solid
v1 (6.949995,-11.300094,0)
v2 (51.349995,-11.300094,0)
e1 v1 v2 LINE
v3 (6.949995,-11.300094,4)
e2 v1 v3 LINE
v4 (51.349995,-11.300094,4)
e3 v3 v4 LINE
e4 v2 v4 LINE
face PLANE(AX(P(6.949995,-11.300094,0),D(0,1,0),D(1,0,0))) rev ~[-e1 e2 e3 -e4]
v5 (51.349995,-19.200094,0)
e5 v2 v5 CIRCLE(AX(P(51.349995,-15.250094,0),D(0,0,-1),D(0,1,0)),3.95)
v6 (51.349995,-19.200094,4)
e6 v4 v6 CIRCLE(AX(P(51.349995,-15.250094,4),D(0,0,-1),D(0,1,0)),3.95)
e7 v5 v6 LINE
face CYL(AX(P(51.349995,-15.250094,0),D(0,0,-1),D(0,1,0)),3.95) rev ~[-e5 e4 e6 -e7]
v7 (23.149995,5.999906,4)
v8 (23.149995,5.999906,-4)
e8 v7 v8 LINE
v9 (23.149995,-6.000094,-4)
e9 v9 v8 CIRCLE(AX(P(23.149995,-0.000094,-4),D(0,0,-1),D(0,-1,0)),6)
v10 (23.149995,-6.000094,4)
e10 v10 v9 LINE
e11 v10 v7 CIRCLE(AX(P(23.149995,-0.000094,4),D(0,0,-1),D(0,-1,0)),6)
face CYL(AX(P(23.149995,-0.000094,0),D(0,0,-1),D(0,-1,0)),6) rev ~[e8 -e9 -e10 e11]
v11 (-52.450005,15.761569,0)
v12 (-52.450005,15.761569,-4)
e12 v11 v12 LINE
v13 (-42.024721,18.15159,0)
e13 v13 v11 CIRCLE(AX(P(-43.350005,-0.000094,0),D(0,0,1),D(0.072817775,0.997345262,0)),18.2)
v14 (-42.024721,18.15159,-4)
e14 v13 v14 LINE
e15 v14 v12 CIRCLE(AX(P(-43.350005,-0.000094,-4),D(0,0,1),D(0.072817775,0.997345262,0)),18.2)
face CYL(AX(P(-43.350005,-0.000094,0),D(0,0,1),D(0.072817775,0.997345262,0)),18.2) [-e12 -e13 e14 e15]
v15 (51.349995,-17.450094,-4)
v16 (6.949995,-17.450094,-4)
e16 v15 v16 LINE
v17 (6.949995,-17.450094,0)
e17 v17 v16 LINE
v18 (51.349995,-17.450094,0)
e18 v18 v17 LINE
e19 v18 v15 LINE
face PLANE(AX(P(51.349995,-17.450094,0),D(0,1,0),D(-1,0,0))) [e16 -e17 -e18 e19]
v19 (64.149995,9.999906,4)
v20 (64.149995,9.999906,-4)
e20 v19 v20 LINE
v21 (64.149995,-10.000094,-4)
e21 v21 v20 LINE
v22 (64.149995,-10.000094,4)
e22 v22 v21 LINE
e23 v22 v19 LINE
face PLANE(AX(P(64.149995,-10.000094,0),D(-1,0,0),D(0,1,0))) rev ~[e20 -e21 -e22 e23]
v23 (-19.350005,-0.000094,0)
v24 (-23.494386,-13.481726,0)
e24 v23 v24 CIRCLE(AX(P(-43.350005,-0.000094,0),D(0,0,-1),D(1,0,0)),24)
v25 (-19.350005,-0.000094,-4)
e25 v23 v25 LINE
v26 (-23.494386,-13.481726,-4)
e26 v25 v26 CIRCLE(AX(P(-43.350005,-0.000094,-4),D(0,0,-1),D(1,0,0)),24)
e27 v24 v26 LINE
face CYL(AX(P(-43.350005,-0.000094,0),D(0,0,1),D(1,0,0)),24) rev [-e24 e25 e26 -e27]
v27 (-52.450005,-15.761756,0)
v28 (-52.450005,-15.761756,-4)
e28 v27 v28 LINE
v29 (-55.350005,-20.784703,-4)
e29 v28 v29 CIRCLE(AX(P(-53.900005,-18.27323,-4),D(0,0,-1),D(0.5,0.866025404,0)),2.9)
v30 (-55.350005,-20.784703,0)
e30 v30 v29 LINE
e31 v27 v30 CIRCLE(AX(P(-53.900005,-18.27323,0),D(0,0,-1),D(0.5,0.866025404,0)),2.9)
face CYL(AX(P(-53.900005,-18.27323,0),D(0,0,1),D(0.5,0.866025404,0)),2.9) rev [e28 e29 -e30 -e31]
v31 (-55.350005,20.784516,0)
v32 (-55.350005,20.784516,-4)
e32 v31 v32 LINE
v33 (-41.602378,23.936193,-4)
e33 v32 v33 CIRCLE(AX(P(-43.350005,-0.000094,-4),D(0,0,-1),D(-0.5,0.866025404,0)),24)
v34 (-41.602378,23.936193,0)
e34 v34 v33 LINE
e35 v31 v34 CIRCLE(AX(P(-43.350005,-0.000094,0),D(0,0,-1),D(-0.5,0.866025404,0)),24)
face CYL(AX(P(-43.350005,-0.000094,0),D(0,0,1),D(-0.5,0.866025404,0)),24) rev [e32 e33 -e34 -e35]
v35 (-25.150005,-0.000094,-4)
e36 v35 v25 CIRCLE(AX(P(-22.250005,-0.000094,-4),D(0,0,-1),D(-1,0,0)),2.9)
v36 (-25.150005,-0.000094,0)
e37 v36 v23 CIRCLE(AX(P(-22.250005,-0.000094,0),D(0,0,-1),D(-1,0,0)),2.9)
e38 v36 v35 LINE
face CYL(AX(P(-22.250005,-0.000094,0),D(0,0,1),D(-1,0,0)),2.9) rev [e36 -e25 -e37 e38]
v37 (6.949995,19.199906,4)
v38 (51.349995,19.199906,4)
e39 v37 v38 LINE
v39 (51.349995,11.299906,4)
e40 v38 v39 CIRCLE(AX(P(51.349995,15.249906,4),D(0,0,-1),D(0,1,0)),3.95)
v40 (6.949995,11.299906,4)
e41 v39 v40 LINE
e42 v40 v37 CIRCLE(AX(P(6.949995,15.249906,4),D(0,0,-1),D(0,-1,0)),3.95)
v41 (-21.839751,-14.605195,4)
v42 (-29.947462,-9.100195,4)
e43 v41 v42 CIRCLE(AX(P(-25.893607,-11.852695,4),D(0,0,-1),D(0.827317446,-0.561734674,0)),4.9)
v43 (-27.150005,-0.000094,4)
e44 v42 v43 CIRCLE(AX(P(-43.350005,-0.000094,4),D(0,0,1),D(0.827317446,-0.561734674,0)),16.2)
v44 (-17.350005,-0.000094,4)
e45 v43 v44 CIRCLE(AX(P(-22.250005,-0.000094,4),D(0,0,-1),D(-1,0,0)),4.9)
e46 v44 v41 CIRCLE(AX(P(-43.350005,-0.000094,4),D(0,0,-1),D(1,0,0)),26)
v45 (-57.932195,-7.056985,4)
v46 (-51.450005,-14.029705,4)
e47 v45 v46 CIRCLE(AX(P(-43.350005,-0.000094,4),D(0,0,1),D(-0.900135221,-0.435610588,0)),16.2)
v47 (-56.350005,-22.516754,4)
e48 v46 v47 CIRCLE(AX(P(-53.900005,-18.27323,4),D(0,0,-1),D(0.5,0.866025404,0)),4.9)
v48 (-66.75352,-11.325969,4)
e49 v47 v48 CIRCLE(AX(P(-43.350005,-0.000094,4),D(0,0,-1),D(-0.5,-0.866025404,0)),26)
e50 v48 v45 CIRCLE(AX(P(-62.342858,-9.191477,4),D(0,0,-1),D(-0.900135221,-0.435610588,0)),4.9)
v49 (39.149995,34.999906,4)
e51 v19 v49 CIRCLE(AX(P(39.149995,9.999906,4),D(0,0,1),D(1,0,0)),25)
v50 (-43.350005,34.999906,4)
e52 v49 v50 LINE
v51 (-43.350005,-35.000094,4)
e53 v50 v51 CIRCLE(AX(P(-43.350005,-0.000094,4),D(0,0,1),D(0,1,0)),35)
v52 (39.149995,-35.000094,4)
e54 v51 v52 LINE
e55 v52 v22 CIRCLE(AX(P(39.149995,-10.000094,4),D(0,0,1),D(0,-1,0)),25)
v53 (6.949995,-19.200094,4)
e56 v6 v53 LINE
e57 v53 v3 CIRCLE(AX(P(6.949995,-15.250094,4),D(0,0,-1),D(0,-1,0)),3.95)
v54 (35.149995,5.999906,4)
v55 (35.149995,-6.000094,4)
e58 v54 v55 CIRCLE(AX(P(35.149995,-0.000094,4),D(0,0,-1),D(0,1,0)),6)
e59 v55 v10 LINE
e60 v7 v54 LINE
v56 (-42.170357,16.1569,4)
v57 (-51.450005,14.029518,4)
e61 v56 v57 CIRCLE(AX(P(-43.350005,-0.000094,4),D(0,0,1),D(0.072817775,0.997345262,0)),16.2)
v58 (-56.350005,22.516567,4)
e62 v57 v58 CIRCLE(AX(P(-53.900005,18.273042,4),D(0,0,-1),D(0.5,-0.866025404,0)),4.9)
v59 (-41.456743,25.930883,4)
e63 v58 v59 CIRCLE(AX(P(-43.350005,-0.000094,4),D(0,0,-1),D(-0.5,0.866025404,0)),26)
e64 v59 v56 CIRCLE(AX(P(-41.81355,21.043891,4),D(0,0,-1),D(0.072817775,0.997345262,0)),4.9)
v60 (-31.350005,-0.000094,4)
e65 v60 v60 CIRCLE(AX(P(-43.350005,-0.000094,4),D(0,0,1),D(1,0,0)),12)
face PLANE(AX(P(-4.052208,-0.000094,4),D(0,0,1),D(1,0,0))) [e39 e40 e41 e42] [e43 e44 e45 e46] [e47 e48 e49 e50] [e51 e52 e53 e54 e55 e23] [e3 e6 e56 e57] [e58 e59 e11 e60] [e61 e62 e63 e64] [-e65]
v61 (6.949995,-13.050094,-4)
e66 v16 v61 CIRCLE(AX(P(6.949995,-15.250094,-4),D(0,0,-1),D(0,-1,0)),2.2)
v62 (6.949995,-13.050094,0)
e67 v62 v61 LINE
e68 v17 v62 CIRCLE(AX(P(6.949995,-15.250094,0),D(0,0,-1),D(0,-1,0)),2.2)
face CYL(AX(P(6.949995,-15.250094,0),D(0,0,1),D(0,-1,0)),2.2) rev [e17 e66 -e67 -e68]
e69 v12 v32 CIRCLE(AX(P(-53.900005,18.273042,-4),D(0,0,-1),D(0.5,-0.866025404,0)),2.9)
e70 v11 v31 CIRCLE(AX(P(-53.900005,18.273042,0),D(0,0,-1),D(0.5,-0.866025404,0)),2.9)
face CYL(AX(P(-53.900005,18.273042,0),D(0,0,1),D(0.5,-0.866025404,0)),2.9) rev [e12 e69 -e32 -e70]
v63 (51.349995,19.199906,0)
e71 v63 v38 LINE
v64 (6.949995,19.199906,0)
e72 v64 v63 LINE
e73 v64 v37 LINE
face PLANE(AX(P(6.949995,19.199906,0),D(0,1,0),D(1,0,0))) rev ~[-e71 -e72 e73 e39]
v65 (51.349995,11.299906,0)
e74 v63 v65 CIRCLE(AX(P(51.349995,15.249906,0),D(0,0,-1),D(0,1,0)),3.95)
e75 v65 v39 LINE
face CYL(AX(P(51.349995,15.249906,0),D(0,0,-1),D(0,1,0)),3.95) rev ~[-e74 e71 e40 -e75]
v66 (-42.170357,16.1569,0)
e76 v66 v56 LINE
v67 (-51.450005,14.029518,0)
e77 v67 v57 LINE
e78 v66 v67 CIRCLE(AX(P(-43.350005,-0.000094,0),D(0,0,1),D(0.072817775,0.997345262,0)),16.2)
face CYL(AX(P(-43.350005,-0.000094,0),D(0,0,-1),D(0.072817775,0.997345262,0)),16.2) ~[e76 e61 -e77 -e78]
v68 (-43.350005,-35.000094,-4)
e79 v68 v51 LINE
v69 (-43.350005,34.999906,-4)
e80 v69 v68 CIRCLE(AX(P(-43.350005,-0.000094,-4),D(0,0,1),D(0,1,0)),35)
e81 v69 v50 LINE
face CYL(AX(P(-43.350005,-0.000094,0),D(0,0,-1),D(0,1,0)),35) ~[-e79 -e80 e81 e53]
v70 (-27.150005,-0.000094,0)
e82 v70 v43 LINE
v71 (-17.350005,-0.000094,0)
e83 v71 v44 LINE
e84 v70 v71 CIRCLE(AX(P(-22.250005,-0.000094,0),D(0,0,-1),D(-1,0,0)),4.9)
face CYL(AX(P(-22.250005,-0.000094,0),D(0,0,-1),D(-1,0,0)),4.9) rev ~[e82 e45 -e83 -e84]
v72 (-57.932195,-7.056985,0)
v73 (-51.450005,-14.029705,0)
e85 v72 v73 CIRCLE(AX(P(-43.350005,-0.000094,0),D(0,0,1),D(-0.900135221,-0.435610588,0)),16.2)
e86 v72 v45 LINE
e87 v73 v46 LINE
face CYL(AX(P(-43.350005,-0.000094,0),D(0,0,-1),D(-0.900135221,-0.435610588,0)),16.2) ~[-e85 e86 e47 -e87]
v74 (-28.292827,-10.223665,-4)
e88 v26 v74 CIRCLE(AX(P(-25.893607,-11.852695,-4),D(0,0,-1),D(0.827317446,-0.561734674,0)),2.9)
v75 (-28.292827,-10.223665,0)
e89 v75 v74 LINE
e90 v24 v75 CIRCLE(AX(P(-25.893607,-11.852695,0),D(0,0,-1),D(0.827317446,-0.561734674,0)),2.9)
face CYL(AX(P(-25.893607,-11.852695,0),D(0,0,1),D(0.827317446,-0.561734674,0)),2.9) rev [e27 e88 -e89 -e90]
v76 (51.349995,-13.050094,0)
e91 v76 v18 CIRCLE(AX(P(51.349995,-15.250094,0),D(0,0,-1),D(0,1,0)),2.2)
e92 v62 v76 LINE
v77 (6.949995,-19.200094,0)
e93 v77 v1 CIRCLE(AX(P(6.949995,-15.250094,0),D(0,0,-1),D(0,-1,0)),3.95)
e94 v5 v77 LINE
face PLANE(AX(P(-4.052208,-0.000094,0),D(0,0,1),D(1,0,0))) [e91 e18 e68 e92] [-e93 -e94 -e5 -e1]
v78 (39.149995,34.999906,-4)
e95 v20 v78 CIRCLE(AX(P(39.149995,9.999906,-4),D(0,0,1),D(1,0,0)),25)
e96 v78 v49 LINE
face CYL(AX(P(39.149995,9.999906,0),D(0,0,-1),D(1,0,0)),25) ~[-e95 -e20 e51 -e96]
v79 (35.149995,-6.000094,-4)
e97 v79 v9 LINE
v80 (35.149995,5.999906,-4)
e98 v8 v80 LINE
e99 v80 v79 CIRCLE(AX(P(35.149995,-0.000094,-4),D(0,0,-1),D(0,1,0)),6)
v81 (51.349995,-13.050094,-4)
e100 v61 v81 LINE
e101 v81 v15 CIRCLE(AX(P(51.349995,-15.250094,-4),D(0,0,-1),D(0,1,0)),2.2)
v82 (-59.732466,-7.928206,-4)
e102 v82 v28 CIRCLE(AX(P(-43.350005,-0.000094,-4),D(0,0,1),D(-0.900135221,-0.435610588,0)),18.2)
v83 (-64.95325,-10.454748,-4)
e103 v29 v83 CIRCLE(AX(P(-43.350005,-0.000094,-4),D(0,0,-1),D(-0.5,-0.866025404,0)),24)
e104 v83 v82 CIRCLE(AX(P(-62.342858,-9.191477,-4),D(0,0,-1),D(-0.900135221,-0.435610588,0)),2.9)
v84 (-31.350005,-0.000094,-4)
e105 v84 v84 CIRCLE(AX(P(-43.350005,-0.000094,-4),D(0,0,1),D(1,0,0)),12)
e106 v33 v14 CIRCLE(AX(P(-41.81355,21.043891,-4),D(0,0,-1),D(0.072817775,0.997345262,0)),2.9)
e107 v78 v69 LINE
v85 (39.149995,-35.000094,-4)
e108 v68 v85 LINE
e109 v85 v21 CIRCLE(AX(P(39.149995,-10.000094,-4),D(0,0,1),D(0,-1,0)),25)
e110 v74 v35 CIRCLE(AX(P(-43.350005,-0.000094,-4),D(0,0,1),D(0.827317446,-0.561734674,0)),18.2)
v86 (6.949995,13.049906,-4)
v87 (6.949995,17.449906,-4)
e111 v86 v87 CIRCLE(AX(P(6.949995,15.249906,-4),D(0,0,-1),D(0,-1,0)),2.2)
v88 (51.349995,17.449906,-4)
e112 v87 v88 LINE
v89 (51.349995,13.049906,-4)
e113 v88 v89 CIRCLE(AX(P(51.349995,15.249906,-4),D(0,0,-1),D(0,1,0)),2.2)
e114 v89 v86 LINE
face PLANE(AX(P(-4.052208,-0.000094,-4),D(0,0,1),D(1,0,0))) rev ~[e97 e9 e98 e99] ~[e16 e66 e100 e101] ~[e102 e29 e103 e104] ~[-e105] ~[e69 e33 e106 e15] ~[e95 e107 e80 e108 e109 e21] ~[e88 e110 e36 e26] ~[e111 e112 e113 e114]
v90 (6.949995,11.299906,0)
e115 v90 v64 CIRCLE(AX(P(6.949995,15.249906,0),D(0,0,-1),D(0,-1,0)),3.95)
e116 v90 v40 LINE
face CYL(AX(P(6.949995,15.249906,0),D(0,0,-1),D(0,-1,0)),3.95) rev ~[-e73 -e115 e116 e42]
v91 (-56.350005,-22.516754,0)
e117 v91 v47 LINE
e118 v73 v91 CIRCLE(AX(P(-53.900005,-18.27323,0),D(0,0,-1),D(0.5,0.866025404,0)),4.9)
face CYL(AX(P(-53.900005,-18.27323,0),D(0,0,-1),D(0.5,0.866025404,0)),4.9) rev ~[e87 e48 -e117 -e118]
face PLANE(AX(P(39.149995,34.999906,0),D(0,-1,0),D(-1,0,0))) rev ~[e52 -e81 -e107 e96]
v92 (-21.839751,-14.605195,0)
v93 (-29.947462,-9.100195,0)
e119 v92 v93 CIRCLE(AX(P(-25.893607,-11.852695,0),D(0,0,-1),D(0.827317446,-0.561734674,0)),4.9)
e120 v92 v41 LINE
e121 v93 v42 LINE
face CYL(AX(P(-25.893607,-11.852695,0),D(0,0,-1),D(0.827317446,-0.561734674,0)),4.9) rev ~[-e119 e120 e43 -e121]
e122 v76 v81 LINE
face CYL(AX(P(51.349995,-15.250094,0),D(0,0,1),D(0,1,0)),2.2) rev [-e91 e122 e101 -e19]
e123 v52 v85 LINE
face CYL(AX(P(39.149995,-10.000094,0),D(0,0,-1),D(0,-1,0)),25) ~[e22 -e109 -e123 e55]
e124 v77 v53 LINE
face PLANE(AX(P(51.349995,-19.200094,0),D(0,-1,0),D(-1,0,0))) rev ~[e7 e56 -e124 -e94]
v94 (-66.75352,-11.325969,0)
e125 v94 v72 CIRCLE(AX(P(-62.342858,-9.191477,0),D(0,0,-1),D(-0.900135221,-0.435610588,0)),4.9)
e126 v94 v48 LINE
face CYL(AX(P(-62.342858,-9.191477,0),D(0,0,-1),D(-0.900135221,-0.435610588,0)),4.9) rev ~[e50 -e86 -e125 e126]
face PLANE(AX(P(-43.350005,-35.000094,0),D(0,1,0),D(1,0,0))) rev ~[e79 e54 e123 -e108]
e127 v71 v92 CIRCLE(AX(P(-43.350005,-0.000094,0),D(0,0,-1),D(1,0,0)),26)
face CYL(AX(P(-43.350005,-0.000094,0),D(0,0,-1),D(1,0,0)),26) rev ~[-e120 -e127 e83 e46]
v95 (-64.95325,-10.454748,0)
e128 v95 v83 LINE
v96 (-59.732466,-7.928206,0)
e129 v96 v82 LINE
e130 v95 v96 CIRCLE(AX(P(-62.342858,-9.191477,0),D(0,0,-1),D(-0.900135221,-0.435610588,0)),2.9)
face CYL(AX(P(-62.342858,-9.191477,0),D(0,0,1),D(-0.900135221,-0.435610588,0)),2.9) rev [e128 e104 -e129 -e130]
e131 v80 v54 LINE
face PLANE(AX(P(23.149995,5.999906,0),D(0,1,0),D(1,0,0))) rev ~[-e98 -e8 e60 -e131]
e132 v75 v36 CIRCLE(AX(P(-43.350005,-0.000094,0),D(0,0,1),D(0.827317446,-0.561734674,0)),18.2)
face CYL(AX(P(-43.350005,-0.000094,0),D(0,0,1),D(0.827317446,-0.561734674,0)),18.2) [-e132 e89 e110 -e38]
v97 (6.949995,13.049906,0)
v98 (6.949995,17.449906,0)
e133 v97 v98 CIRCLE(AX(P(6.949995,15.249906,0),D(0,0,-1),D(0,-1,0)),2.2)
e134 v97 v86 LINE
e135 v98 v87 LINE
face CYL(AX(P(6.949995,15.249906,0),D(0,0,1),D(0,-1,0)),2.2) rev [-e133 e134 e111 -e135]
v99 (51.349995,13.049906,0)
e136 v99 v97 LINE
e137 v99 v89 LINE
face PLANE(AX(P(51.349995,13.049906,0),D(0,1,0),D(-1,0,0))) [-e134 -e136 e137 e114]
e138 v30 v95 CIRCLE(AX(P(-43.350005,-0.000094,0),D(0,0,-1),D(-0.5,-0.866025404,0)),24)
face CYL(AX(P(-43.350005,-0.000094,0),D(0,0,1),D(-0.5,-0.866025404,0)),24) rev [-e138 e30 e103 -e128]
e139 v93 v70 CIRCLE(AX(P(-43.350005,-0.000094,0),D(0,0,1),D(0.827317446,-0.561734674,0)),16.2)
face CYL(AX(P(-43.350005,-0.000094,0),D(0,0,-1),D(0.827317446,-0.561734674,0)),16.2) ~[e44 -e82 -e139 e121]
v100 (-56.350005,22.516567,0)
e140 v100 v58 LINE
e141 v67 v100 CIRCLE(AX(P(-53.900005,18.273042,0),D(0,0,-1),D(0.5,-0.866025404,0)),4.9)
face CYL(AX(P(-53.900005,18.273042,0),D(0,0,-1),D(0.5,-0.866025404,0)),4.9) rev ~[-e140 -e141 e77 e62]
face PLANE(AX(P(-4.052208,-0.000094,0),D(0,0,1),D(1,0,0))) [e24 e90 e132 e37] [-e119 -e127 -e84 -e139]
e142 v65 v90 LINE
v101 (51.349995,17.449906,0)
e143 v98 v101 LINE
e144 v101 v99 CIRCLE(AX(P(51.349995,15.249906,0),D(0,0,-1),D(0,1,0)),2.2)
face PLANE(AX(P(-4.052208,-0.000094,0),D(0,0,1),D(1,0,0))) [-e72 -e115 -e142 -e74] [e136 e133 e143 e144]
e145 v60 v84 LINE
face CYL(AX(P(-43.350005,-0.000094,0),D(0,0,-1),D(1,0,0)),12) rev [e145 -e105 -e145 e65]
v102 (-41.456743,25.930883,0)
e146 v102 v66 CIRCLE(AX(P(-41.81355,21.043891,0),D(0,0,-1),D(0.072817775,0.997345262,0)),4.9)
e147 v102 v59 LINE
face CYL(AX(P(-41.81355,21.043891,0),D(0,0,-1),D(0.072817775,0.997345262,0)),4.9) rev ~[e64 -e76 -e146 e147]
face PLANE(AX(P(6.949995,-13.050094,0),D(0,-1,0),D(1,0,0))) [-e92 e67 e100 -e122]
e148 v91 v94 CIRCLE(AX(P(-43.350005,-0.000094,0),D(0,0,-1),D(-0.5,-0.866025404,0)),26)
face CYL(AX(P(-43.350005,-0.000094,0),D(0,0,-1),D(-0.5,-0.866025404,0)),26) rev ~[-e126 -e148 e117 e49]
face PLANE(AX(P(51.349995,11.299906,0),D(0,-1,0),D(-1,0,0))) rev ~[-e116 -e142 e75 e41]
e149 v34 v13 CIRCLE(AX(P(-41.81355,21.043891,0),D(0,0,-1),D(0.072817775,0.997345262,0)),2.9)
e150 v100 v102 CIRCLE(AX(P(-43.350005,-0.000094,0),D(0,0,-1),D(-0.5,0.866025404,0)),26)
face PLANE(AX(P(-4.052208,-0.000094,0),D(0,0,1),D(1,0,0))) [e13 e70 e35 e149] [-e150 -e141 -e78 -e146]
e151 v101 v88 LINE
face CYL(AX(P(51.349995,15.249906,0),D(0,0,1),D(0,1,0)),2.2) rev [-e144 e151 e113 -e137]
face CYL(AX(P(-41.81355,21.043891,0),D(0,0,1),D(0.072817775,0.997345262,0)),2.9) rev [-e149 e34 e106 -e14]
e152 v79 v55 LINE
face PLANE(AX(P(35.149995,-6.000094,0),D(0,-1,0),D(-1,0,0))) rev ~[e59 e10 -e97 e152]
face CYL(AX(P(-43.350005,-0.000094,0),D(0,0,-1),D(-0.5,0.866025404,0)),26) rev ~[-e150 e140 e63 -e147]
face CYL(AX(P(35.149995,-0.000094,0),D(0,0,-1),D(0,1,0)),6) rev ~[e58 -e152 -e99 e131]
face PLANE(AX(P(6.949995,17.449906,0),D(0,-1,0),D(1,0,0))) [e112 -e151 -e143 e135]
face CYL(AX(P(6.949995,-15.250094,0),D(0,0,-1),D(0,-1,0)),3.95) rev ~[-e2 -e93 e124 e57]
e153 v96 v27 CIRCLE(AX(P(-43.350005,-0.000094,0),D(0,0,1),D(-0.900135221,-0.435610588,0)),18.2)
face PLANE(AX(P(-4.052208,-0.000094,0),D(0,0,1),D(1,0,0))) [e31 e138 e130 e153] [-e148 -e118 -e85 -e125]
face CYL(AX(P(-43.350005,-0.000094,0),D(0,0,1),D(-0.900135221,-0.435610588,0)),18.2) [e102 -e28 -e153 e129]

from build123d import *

# Parameters (mm, degrees)
F0_R     = 12
F1_DEPTH = 4
F2_DEPTH = 4


# Not quite as in the source:
# - a feature names something its author has since deleted; it is built from what else it names


with BuildPart() as f1:
    # F0 (on Top) → F1 (new body)
    with BuildSketch(Plane.XY):
        with BuildLine():
            ThreePointArc((64.1499952853, 9.9999063548), (56.8276648149, 27.6775758844), (39.1499952853, 34.9999063548))
            Line((39.1499952853, 34.9999063548), (-43.3500047147, 34.9999063548))
            ThreePointArc((-43.3500047147, 34.9999063548), (-78.3500047147, -9.36452e-05), (-43.3500047147, -35.0000936452))
            Line((-43.3500047147, -35.0000936452), (39.1499952853, -35.0000936452))
            ThreePointArc((39.1499952853, -35.0000936452), (56.8276648149, -27.6777631749), (64.1499952853, -10.0000936452))
            Line((64.1499952853, -10.0000936452), (64.1499952853, 9.9999063548))
        make_face()
        with BuildLine():
            ThreePointArc((-66.7535204548, -11.3259689317), (-64.4773497539, -4.780814469), (-57.9321952912, -7.0569851699))
            ThreePointArc((-57.9321952912, -7.0569851699), (-55.2148750657, -11.0302727714), (-51.4500047147, -14.0297051866))
            ThreePointArc((-51.4500047147, -14.0297051866), (-49.6564802362, -20.7232296651), (-56.3500047147, -22.5167541436))
            ThreePointArc((-56.3500047147, -22.5167541436), (-62.3923892286, -17.7028502675), (-66.7535204548, -11.3259689317))
        make_face(mode=Mode.SUBTRACT)
        with BuildLine():
            ThreePointArc((-21.8397511265, -14.6051951708), (-28.6461065134, -15.9065507518), (-29.9474620944, -9.100195365))
            ThreePointArc((-29.9474620944, -9.100195365), (-27.8651542077, -4.7602832187), (-27.1500047147, -9.36452e-05))
            ThreePointArc((-27.1500047147, -9.36452e-05), (-22.2500047147, 4.8999063548), (-17.3500047147, -9.36452e-05))
            ThreePointArc((-17.3500047147, -9.36452e-05), (-18.4977755059, -7.6399040718), (-21.8397511265, -14.6051951708))
        make_face(mode=Mode.SUBTRACT)
        with BuildLine():
            ThreePointArc((6.9499952853, -19.2000936452), (2.9999952853, -15.2500936452), (6.9499952853, -11.3000936452))
            Line((6.9499952853, -11.3000936452), (29.1499952853, -11.3000936452))
            Line((29.1499952853, -11.3000936452), (51.3499952853, -11.3000936452))
            ThreePointArc((51.3499952853, -11.3000936452), (55.2999952853, -15.2500936452), (51.3499952853, -19.2000936452))
            Line((51.3499952853, -19.2000936452), (29.1499952853, -19.2000936452))
            Line((29.1499952853, -19.2000936452), (6.9499952853, -19.2000936452))
        make_face(mode=Mode.SUBTRACT)
        with Locations((-43.3500047147, -9.36452e-05)):
            Circle(F0_R, mode=Mode.SUBTRACT)
        with BuildLine():
            ThreePointArc((-51.4500047147, 14.0295178961), (-58.1435291933, 15.8230423746), (-56.3500047147, 22.5165668531))
            ThreePointArc((-56.3500047147, 22.5165668531), (-49.1598494096, 25.3424734035), (-41.4567425628, 25.9308831667))
            ThreePointArc((-41.4567425628, 25.9308831667), (-36.9265578769, 20.6870842851), (-42.1703567586, 16.1568995991))
            ThreePointArc((-42.1703567586, 16.1568995991), (-46.9699848708, 15.7902750544), (-51.4500047147, 14.0295178961))
        make_face(mode=Mode.SUBTRACT)
        with BuildLine():
            Line((29.1499952853, 5.9999063548), (35.1499952853, 5.9999063548))
            ThreePointArc((35.1499952853, 5.9999063548), (41.1499952853, -9.36452e-05), (35.1499952853, -6.0000936452))
            Line((35.1499952853, -6.0000936452), (29.1499952853, -6.0000936452))
            Line((29.1499952853, -6.0000936452), (23.1499952853, -6.0000936452))
            ThreePointArc((23.1499952853, -6.0000936452), (17.1499952853, -9.36452e-05), (23.1499952853, 5.9999063548))
            Line((23.1499952853, 5.9999063548), (29.1499952853, 5.9999063548))
        make_face(mode=Mode.SUBTRACT)
        with BuildLine():
            Line((29.1499952853, 11.2999063548), (6.9499952853, 11.2999063548))
            ThreePointArc((6.9499952853, 11.2999063548), (2.9999952853, 15.2499063548), (6.9499952853, 19.1999063548))
            Line((6.9499952853, 19.1999063548), (29.1499952853, 19.1999063548))
            Line((29.1499952853, 19.1999063548), (51.3499952853, 19.1999063548))
            ThreePointArc((51.3499952853, 19.1999063548), (55.2999952853, 15.2499063548), (51.3499952853, 11.2999063548))
            Line((51.3499952853, 11.2999063548), (29.1499952853, 11.2999063548))
        make_face(mode=Mode.SUBTRACT)
        with BuildLine():
            ThreePointArc((-41.4567425628, 25.9308831667), (-49.1598494096, 25.3424734035), (-56.3500047147, 22.5165668531))
            ThreePointArc((-56.3500047147, 22.5165668531), (-58.1435291933, 15.8230423746), (-51.4500047147, 14.0295178961))
            ThreePointArc((-51.4500047147, 14.0295178961), (-46.9699848708, 15.7902750544), (-42.1703567586, 16.1568995991))
            ThreePointArc((-42.1703567586, 16.1568995991), (-36.9265578769, 20.6870842851), (-41.4567425628, 25.9308831667))
        make_face()
        with BuildLine():
            ThreePointArc((-52.4500047147, 15.7615687036), (-56.4114783857, 16.8230423746), (-55.3500047147, 20.7845160456))
            ThreePointArc((-55.3500047147, 20.7845160456), (-48.7129382793, 23.393045169), (-41.602378113, 23.9361926427))
            ThreePointArc((-41.602378113, 23.9361926427), (-38.9212484009, 20.8327198352), (-42.0247212084, 18.1515901231))
            ThreePointArc((-42.0247212084, 18.1515901231), (-47.4168960012, 17.7397032889), (-52.4500047147, 15.7615687036))
        make_face(mode=Mode.SUBTRACT)
        with BuildLine():
            ThreePointArc((-27.1500047147, -9.36452e-05), (-27.8651542077, -4.7602832187), (-29.9474620944, -9.100195365))
            ThreePointArc((-29.9474620944, -9.100195365), (-28.6461065134, -15.9065507518), (-21.8397511265, -14.6051951708))
            ThreePointArc((-21.8397511265, -14.6051951708), (-18.4977755059, -7.6399040718), (-17.3500047147, -9.36452e-05))
            ThreePointArc((-17.3500047147, -9.36452e-05), (-22.2500047147, 4.8999063548), (-27.1500047147, -9.36452e-05))
        make_face()
        with BuildLine():
            ThreePointArc((-23.4943860179, -13.4817258227), (-27.5226371652, -14.2519158604), (-28.292827203, -10.2236647131))
            ThreePointArc((-28.292827203, -10.2236647131), (-25.9534442686, -5.3479609438), (-25.1500047147, -9.36452e-05))
            ThreePointArc((-25.1500047147, -9.36452e-05), (-22.2500047147, 2.8999063548), (-19.3500047147, -9.36452e-05))
            ThreePointArc((-19.3500047147, -9.36452e-05), (-20.4094854451, -7.0522263467), (-23.4943860179, -13.4817258227))
        make_face(mode=Mode.SUBTRACT)
        with BuildLine():
            ThreePointArc((-51.4500047147, -14.0297051866), (-55.2148750657, -11.0302727714), (-57.9321952912, -7.0569851699))
            ThreePointArc((-57.9321952912, -7.0569851699), (-64.4773497539, -4.780814469), (-66.7535204548, -11.3259689317))
            ThreePointArc((-66.7535204548, -11.3259689317), (-62.3923892286, -17.7028502675), (-56.3500047147, -22.5167541436))
            ThreePointArc((-56.3500047147, -22.5167541436), (-49.6564802362, -20.7232296651), (-51.4500047147, -14.0297051866))
        make_face()
        with BuildLine():
            ThreePointArc((-64.9532500133, -10.4547477558), (-63.606128578, -6.5810849105), (-59.7324657328, -7.9282063458))
            ThreePointArc((-59.7324657328, -7.9282063458), (-56.6796738744, -12.3920232808), (-52.4500047147, -15.7617559941))
            ThreePointArc((-52.4500047147, -15.7617559941), (-51.3885310438, -19.7232296651), (-55.3500047147, -20.7847033361))
            ThreePointArc((-55.3500047147, -20.7847033361), (-60.9275904198, -16.3410997581), (-64.9532500133, -10.4547477558))
        make_face(mode=Mode.SUBTRACT)
        with BuildLine():
            ThreePointArc((6.9499952853, 19.1999063548), (2.9999952853, 15.2499063548), (6.9499952853, 11.2999063548))
            Line((6.9499952853, 11.2999063548), (29.1499952853, 11.2999063548))
            Line((29.1499952853, 11.2999063548), (51.3499952853, 11.2999063548))
            ThreePointArc((51.3499952853, 11.2999063548), (55.2999952853, 15.2499063548), (51.3499952853, 19.1999063548))
            Line((51.3499952853, 19.1999063548), (29.1499952853, 19.1999063548))
            Line((29.1499952853, 19.1999063548), (6.9499952853, 19.1999063548))
        make_face()
        with BuildLine():
            Line((29.1499952853, 13.0499063548), (6.9499952853, 13.0499063548))
            ThreePointArc((6.9499952853, 13.0499063548), (4.7499952853, 15.2499063548), (6.9499952853, 17.4499063548))
            Line((6.9499952853, 17.4499063548), (29.1499952853, 17.4499063548))
            Line((29.1499952853, 17.4499063548), (51.3499952853, 17.4499063548))
            ThreePointArc((51.3499952853, 17.4499063548), (53.5499952853, 15.2499063548), (51.3499952853, 13.0499063548))
            Line((51.3499952853, 13.0499063548), (29.1499952853, 13.0499063548))
        make_face(mode=Mode.SUBTRACT)
        with BuildLine():
            Line((29.1499952853, -11.3000936452), (6.9499952853, -11.3000936452))
            ThreePointArc((6.9499952853, -11.3000936452), (2.9999952853, -15.2500936452), (6.9499952853, -19.2000936452))
            Line((6.9499952853, -19.2000936452), (29.1499952853, -19.2000936452))
            Line((29.1499952853, -19.2000936452), (51.3499952853, -19.2000936452))
            ThreePointArc((51.3499952853, -19.2000936452), (55.2999952853, -15.2500936452), (51.3499952853, -11.3000936452))
            Line((51.3499952853, -11.3000936452), (29.1499952853, -11.3000936452))
        make_face()
        with BuildLine():
            ThreePointArc((6.9499952853, -17.4500936452), (4.7499952853, -15.2500936452), (6.9499952853, -13.0500936452))
            Line((6.9499952853, -13.0500936452), (29.1499952853, -13.0500936452))
            Line((29.1499952853, -13.0500936452), (51.3499952853, -13.0500936452))
            ThreePointArc((51.3499952853, -13.0500936452), (53.5499952853, -15.2500936452), (51.3499952853, -17.4500936452))
            Line((51.3499952853, -17.4500936452), (29.1499952853, -17.4500936452))
            Line((29.1499952853, -17.4500936452), (6.9499952853, -17.4500936452))
        make_face(mode=Mode.SUBTRACT)
    extrude(amount=-F1_DEPTH)

    # F0 (on Top) → F2 (join)
    with BuildSketch(Plane.XY):
        with BuildLine():
            ThreePointArc((64.1499952853, 9.9999063548), (56.8276648149, 27.6775758844), (39.1499952853, 34.9999063548))
            Line((39.1499952853, 34.9999063548), (-43.3500047147, 34.9999063548))
            ThreePointArc((-43.3500047147, 34.9999063548), (-78.3500047147, -9.36452e-05), (-43.3500047147, -35.0000936452))
            Line((-43.3500047147, -35.0000936452), (39.1499952853, -35.0000936452))
            ThreePointArc((39.1499952853, -35.0000936452), (56.8276648149, -27.6777631749), (64.1499952853, -10.0000936452))
            Line((64.1499952853, -10.0000936452), (64.1499952853, 9.9999063548))
        make_face()
        with BuildLine():
            ThreePointArc((-66.7535204548, -11.3259689317), (-64.4773497539, -4.780814469), (-57.9321952912, -7.0569851699))
            ThreePointArc((-57.9321952912, -7.0569851699), (-55.2148750657, -11.0302727714), (-51.4500047147, -14.0297051866))
            ThreePointArc((-51.4500047147, -14.0297051866), (-49.6564802362, -20.7232296651), (-56.3500047147, -22.5167541436))
            ThreePointArc((-56.3500047147, -22.5167541436), (-62.3923892286, -17.7028502675), (-66.7535204548, -11.3259689317))
        make_face(mode=Mode.SUBTRACT)
        with BuildLine():
            ThreePointArc((-21.8397511265, -14.6051951708), (-28.6461065134, -15.9065507518), (-29.9474620944, -9.100195365))
            ThreePointArc((-29.9474620944, -9.100195365), (-27.8651542077, -4.7602832187), (-27.1500047147, -9.36452e-05))
            ThreePointArc((-27.1500047147, -9.36452e-05), (-22.2500047147, 4.8999063548), (-17.3500047147, -9.36452e-05))
            ThreePointArc((-17.3500047147, -9.36452e-05), (-18.4977755059, -7.6399040718), (-21.8397511265, -14.6051951708))
        make_face(mode=Mode.SUBTRACT)
        with BuildLine():
            ThreePointArc((6.9499952853, -19.2000936452), (2.9999952853, -15.2500936452), (6.9499952853, -11.3000936452))
            Line((6.9499952853, -11.3000936452), (29.1499952853, -11.3000936452))
            Line((29.1499952853, -11.3000936452), (51.3499952853, -11.3000936452))
            ThreePointArc((51.3499952853, -11.3000936452), (55.2999952853, -15.2500936452), (51.3499952853, -19.2000936452))
            Line((51.3499952853, -19.2000936452), (29.1499952853, -19.2000936452))
            Line((29.1499952853, -19.2000936452), (6.9499952853, -19.2000936452))
        make_face(mode=Mode.SUBTRACT)
        with Locations((-43.3500047147, -9.36452e-05)):
            Circle(F0_R, mode=Mode.SUBTRACT)
        with BuildLine():
            ThreePointArc((-51.4500047147, 14.0295178961), (-58.1435291933, 15.8230423746), (-56.3500047147, 22.5165668531))
            ThreePointArc((-56.3500047147, 22.5165668531), (-49.1598494096, 25.3424734035), (-41.4567425628, 25.9308831667))
            ThreePointArc((-41.4567425628, 25.9308831667), (-36.9265578769, 20.6870842851), (-42.1703567586, 16.1568995991))
            ThreePointArc((-42.1703567586, 16.1568995991), (-46.9699848708, 15.7902750544), (-51.4500047147, 14.0295178961))
        make_face(mode=Mode.SUBTRACT)
        with BuildLine():
            Line((29.1499952853, 5.9999063548), (35.1499952853, 5.9999063548))
            ThreePointArc((35.1499952853, 5.9999063548), (41.1499952853, -9.36452e-05), (35.1499952853, -6.0000936452))
            Line((35.1499952853, -6.0000936452), (29.1499952853, -6.0000936452))
            Line((29.1499952853, -6.0000936452), (23.1499952853, -6.0000936452))
            ThreePointArc((23.1499952853, -6.0000936452), (17.1499952853, -9.36452e-05), (23.1499952853, 5.9999063548))
            Line((23.1499952853, 5.9999063548), (29.1499952853, 5.9999063548))
        make_face(mode=Mode.SUBTRACT)
        with BuildLine():
            Line((29.1499952853, 11.2999063548), (6.9499952853, 11.2999063548))
            ThreePointArc((6.9499952853, 11.2999063548), (2.9999952853, 15.2499063548), (6.9499952853, 19.1999063548))
            Line((6.9499952853, 19.1999063548), (29.1499952853, 19.1999063548))
            Line((29.1499952853, 19.1999063548), (51.3499952853, 19.1999063548))
            ThreePointArc((51.3499952853, 19.1999063548), (55.2999952853, 15.2499063548), (51.3499952853, 11.2999063548))
            Line((51.3499952853, 11.2999063548), (29.1499952853, 11.2999063548))
        make_face(mode=Mode.SUBTRACT)
    extrude(amount=F2_DEPTH)


solid = f1.part
